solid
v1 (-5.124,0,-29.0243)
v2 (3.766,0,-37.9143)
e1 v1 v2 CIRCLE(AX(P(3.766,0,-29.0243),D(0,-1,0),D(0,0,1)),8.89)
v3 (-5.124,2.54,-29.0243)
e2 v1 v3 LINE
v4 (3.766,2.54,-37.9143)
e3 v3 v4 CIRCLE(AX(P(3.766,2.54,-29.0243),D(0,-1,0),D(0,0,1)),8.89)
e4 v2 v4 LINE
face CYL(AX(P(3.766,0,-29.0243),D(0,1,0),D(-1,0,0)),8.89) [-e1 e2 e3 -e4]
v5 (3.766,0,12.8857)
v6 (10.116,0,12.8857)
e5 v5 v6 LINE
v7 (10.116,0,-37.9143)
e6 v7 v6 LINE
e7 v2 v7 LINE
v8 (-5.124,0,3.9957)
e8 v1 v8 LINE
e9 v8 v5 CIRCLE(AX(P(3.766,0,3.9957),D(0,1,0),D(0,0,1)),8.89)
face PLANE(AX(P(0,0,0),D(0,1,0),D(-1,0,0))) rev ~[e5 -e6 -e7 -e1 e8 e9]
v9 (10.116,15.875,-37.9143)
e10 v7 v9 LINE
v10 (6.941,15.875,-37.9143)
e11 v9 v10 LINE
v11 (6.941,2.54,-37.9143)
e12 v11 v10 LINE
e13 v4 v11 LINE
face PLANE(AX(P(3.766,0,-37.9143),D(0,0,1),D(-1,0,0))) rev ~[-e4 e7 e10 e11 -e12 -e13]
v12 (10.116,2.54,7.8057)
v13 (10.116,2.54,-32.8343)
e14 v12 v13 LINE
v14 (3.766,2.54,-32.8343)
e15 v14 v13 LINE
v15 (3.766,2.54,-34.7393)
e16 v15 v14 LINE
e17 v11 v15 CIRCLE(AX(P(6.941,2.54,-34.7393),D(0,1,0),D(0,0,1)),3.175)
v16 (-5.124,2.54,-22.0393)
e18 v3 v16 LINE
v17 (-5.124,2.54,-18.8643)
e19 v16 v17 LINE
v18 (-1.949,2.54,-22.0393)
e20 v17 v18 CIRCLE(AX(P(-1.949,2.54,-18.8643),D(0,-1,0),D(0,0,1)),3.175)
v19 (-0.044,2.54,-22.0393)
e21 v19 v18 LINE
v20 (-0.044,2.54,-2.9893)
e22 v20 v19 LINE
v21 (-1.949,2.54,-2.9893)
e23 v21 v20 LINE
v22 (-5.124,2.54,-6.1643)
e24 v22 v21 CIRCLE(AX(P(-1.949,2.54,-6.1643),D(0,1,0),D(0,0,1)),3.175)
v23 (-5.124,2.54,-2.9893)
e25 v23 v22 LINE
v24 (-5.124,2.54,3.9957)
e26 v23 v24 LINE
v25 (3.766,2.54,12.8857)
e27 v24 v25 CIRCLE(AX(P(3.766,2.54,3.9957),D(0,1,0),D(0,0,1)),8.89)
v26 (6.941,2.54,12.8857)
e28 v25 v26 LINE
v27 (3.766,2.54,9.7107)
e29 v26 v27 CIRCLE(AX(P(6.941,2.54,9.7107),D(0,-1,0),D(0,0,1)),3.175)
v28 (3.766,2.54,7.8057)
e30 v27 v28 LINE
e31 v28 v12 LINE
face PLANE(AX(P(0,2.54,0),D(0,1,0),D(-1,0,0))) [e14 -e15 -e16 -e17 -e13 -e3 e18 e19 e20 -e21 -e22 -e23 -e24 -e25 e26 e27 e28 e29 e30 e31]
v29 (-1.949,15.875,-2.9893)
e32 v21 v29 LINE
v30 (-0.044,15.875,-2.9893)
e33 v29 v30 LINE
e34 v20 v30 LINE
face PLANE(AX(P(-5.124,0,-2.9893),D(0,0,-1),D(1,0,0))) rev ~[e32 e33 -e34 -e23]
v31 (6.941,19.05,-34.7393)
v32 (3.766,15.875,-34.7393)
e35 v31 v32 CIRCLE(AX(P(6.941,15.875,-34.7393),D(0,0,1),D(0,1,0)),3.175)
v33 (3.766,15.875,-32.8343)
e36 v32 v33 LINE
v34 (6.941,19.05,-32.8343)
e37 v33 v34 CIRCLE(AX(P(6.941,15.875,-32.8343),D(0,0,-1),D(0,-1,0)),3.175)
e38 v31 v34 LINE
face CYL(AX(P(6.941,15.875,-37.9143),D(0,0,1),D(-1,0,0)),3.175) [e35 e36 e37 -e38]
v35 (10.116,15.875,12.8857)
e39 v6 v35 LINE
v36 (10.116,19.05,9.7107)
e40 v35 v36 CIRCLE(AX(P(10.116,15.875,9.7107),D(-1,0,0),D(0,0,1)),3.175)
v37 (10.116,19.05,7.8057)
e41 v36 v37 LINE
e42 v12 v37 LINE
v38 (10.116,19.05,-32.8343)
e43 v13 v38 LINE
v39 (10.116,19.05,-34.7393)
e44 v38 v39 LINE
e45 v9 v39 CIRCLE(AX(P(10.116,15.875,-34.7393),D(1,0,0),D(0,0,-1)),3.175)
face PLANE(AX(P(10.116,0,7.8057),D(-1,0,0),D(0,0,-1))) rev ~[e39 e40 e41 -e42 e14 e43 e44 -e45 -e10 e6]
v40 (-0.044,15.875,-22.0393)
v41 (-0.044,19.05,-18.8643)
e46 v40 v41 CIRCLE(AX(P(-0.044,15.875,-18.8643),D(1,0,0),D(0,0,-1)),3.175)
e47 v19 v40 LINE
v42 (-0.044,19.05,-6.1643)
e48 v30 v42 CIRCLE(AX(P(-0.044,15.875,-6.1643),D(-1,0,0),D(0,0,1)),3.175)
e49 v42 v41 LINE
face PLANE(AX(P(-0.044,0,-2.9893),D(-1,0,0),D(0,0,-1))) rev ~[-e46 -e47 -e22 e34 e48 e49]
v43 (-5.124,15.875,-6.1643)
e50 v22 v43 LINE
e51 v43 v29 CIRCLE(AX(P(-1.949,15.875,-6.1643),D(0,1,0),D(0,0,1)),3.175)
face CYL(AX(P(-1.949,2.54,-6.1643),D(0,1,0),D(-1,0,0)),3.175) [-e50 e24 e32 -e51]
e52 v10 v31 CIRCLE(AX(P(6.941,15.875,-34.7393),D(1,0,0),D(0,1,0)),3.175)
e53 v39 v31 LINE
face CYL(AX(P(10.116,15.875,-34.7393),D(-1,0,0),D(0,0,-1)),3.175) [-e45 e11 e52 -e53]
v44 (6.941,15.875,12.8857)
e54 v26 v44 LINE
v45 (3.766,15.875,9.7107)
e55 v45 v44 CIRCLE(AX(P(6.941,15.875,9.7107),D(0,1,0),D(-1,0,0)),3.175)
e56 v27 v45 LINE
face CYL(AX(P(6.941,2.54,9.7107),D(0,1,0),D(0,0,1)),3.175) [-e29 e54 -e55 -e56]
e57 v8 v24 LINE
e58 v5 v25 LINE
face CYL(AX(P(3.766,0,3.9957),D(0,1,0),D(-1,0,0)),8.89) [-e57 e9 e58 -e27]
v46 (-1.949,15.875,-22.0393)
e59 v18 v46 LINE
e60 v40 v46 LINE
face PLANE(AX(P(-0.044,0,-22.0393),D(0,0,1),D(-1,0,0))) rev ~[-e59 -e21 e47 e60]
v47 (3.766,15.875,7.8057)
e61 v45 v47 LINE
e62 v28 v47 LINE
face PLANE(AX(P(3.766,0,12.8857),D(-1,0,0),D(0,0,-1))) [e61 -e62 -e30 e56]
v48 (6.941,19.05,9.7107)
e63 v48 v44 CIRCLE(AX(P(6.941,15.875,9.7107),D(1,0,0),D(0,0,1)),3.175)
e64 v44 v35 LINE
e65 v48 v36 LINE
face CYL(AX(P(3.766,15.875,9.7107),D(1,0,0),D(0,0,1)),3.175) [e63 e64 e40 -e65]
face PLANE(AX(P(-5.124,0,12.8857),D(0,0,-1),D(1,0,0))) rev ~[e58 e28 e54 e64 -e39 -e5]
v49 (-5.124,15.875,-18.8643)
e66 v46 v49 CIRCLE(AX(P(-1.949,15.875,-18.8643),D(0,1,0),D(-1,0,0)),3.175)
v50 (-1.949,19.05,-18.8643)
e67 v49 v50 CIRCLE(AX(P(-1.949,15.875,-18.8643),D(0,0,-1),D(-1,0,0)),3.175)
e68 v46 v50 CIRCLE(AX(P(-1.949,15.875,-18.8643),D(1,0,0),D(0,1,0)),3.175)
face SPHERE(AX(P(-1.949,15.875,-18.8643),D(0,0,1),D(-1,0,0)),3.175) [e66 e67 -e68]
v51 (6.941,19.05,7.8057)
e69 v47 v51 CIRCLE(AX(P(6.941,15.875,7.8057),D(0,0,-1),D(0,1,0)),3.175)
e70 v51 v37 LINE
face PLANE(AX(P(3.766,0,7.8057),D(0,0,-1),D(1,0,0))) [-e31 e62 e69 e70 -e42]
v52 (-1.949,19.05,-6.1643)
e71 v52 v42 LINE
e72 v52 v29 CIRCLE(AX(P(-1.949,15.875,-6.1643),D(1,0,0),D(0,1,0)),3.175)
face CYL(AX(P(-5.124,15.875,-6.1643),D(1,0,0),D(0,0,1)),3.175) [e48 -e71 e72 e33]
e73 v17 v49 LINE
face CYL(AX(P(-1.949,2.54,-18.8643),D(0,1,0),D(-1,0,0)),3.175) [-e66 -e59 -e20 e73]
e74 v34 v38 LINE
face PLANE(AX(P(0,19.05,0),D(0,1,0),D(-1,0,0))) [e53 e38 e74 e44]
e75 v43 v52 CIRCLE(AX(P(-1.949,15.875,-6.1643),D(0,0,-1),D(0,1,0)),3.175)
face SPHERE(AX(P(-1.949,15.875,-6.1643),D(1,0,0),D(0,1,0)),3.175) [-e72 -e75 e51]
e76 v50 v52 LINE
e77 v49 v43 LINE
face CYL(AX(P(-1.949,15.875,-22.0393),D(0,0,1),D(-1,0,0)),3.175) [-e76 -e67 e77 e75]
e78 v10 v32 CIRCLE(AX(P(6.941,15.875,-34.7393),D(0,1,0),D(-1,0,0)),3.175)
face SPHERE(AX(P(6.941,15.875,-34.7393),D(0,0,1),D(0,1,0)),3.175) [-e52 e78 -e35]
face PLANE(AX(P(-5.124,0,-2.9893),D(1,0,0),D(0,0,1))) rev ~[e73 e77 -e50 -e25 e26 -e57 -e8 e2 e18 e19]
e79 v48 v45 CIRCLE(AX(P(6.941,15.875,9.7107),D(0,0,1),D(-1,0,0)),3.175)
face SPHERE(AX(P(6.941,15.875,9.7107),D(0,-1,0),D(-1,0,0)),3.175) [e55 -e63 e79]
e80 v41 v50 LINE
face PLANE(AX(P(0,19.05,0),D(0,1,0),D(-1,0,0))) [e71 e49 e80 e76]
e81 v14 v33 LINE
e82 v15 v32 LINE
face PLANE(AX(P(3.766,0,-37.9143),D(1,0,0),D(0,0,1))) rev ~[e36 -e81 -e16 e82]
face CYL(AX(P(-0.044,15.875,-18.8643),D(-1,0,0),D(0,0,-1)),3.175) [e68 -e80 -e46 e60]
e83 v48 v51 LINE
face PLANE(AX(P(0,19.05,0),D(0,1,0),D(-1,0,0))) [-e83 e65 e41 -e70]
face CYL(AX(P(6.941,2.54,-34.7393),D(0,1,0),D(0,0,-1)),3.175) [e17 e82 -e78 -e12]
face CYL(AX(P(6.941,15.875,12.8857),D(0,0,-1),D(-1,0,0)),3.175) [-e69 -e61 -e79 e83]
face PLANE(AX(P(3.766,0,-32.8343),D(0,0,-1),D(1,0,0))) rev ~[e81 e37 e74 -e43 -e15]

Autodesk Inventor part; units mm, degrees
ref_plane "YZ Plane" through (0, 0, 0) normal (1, 0, 0) x (0, 1, 0)
ref_plane "XZ Plane" through (0, 0, 0) normal (0, 1, 0) x (-1, 0, 0)
ref_plane "XY Plane" through (0, 0, 0) normal (0, 0, 1) x (1, 0, 0)
sketch "Sketch1" plane through (0, 0, 0) normal (0, 1, 0) x (-1, 0, 0)
  line L0 (5.124, 12.8857) -> (-10.116, 12.8857)
  line L1 (-10.116, 12.8857) -> (-10.116, -37.9143)
  line L2 (-10.116, -37.9143) -> (5.124, -37.9143)
  line L3 (5.124, -37.9143) -> (5.124, 12.8857)
  line L4 (-10.116, 12.8857) -> (-3.766, 12.8857)
  line L5 (-3.766, 12.8857) -> (-3.766, 7.8057)
  line L6 (-3.766, 7.8057) -> (-10.116, 7.8057)
  line L7 (-10.116, 7.8057) -> (-10.116, 12.8857)
  line L8 (-10.116, -37.9143) -> (-3.766, -37.9143)
  line L9 (-3.766, -37.9143) -> (-3.766, -32.8343)
  line L10 (-3.766, -32.8343) -> (-10.116, -32.8343)
  line L11 (-10.116, -32.8343) -> (-10.116, -37.9143)
  line L12 (5.124, -2.9893) -> (0.044, -2.9893)
  line L13 (0.044, -2.9893) -> (0.044, -22.0393)
  line L14 (0.044, -22.0393) -> (5.124, -22.0393)
  line L15 (5.124, -22.0393) -> (5.124, -2.9893)
  point P0 (0, 0)
  dimension "d0" = 15.24
  dimension "d1" = 50.8
  dimension "d2" = 6.35
  dimension "d3" = 5.08
  dimension "d4" = 5.08
  dimension "d8" = 5.08
  dimension "d9" = 19.05
extrude "Extrusion1" add sketch "Sketch1" along normal blind 19.05 contours L5 L6 L1 L0 | L3 L14 L13 L12 | L10 L9 L2 L1
extrude "Extrusion2" add sketch "Sketch1" along normal blind 2.54 contours L3 L12 L13 L14 L2 L9 L10 L1 L6 L5 L0
fillet "Fillet1" radius 8.89 2 edges at (-5.124, 1.27, 12.8857) (-5.124, 1.27, -37.9143)
fillet "Fillet2" radius 3.175 11 edges at (-2.584, 19.05, -2.9893) (-5.124, 19.05, -12.5143) (-5.124, 10.795, -2.9893) (-5.124, 10.795, -22.0393) (-2.584, 19.05, -22.0393) (3.766, 10.795, 12.8857) (3.766, 19.05, 10.3457) (6.941, 19.05, 12.8857) (3.766, 19.05, -35.3743) (6.941, 19.05, -37.9143) (3.766, 10.795, -37.9143)
equation "\"BendRadius\" = Thickness"
equation "\"BendReliefWidth\" = Thickness"
equation "\"BendReliefDepth\" = 0.5 * Thickness"
equation "\"CornerReliefSize\" = 4 * Thickness"
equation "\"MinimumRemnant\" = 2 * Thickness"
equation "\"TransitionRadius\" = BendRadius"
equation "\"JacobiRadiusSize\" = BendRadius"
equation "\"GapSize\" = Thickness"
equation "\"Thickness\" = 3.048"
properties part number "BatteryStopper" material "ABS Plastic"
